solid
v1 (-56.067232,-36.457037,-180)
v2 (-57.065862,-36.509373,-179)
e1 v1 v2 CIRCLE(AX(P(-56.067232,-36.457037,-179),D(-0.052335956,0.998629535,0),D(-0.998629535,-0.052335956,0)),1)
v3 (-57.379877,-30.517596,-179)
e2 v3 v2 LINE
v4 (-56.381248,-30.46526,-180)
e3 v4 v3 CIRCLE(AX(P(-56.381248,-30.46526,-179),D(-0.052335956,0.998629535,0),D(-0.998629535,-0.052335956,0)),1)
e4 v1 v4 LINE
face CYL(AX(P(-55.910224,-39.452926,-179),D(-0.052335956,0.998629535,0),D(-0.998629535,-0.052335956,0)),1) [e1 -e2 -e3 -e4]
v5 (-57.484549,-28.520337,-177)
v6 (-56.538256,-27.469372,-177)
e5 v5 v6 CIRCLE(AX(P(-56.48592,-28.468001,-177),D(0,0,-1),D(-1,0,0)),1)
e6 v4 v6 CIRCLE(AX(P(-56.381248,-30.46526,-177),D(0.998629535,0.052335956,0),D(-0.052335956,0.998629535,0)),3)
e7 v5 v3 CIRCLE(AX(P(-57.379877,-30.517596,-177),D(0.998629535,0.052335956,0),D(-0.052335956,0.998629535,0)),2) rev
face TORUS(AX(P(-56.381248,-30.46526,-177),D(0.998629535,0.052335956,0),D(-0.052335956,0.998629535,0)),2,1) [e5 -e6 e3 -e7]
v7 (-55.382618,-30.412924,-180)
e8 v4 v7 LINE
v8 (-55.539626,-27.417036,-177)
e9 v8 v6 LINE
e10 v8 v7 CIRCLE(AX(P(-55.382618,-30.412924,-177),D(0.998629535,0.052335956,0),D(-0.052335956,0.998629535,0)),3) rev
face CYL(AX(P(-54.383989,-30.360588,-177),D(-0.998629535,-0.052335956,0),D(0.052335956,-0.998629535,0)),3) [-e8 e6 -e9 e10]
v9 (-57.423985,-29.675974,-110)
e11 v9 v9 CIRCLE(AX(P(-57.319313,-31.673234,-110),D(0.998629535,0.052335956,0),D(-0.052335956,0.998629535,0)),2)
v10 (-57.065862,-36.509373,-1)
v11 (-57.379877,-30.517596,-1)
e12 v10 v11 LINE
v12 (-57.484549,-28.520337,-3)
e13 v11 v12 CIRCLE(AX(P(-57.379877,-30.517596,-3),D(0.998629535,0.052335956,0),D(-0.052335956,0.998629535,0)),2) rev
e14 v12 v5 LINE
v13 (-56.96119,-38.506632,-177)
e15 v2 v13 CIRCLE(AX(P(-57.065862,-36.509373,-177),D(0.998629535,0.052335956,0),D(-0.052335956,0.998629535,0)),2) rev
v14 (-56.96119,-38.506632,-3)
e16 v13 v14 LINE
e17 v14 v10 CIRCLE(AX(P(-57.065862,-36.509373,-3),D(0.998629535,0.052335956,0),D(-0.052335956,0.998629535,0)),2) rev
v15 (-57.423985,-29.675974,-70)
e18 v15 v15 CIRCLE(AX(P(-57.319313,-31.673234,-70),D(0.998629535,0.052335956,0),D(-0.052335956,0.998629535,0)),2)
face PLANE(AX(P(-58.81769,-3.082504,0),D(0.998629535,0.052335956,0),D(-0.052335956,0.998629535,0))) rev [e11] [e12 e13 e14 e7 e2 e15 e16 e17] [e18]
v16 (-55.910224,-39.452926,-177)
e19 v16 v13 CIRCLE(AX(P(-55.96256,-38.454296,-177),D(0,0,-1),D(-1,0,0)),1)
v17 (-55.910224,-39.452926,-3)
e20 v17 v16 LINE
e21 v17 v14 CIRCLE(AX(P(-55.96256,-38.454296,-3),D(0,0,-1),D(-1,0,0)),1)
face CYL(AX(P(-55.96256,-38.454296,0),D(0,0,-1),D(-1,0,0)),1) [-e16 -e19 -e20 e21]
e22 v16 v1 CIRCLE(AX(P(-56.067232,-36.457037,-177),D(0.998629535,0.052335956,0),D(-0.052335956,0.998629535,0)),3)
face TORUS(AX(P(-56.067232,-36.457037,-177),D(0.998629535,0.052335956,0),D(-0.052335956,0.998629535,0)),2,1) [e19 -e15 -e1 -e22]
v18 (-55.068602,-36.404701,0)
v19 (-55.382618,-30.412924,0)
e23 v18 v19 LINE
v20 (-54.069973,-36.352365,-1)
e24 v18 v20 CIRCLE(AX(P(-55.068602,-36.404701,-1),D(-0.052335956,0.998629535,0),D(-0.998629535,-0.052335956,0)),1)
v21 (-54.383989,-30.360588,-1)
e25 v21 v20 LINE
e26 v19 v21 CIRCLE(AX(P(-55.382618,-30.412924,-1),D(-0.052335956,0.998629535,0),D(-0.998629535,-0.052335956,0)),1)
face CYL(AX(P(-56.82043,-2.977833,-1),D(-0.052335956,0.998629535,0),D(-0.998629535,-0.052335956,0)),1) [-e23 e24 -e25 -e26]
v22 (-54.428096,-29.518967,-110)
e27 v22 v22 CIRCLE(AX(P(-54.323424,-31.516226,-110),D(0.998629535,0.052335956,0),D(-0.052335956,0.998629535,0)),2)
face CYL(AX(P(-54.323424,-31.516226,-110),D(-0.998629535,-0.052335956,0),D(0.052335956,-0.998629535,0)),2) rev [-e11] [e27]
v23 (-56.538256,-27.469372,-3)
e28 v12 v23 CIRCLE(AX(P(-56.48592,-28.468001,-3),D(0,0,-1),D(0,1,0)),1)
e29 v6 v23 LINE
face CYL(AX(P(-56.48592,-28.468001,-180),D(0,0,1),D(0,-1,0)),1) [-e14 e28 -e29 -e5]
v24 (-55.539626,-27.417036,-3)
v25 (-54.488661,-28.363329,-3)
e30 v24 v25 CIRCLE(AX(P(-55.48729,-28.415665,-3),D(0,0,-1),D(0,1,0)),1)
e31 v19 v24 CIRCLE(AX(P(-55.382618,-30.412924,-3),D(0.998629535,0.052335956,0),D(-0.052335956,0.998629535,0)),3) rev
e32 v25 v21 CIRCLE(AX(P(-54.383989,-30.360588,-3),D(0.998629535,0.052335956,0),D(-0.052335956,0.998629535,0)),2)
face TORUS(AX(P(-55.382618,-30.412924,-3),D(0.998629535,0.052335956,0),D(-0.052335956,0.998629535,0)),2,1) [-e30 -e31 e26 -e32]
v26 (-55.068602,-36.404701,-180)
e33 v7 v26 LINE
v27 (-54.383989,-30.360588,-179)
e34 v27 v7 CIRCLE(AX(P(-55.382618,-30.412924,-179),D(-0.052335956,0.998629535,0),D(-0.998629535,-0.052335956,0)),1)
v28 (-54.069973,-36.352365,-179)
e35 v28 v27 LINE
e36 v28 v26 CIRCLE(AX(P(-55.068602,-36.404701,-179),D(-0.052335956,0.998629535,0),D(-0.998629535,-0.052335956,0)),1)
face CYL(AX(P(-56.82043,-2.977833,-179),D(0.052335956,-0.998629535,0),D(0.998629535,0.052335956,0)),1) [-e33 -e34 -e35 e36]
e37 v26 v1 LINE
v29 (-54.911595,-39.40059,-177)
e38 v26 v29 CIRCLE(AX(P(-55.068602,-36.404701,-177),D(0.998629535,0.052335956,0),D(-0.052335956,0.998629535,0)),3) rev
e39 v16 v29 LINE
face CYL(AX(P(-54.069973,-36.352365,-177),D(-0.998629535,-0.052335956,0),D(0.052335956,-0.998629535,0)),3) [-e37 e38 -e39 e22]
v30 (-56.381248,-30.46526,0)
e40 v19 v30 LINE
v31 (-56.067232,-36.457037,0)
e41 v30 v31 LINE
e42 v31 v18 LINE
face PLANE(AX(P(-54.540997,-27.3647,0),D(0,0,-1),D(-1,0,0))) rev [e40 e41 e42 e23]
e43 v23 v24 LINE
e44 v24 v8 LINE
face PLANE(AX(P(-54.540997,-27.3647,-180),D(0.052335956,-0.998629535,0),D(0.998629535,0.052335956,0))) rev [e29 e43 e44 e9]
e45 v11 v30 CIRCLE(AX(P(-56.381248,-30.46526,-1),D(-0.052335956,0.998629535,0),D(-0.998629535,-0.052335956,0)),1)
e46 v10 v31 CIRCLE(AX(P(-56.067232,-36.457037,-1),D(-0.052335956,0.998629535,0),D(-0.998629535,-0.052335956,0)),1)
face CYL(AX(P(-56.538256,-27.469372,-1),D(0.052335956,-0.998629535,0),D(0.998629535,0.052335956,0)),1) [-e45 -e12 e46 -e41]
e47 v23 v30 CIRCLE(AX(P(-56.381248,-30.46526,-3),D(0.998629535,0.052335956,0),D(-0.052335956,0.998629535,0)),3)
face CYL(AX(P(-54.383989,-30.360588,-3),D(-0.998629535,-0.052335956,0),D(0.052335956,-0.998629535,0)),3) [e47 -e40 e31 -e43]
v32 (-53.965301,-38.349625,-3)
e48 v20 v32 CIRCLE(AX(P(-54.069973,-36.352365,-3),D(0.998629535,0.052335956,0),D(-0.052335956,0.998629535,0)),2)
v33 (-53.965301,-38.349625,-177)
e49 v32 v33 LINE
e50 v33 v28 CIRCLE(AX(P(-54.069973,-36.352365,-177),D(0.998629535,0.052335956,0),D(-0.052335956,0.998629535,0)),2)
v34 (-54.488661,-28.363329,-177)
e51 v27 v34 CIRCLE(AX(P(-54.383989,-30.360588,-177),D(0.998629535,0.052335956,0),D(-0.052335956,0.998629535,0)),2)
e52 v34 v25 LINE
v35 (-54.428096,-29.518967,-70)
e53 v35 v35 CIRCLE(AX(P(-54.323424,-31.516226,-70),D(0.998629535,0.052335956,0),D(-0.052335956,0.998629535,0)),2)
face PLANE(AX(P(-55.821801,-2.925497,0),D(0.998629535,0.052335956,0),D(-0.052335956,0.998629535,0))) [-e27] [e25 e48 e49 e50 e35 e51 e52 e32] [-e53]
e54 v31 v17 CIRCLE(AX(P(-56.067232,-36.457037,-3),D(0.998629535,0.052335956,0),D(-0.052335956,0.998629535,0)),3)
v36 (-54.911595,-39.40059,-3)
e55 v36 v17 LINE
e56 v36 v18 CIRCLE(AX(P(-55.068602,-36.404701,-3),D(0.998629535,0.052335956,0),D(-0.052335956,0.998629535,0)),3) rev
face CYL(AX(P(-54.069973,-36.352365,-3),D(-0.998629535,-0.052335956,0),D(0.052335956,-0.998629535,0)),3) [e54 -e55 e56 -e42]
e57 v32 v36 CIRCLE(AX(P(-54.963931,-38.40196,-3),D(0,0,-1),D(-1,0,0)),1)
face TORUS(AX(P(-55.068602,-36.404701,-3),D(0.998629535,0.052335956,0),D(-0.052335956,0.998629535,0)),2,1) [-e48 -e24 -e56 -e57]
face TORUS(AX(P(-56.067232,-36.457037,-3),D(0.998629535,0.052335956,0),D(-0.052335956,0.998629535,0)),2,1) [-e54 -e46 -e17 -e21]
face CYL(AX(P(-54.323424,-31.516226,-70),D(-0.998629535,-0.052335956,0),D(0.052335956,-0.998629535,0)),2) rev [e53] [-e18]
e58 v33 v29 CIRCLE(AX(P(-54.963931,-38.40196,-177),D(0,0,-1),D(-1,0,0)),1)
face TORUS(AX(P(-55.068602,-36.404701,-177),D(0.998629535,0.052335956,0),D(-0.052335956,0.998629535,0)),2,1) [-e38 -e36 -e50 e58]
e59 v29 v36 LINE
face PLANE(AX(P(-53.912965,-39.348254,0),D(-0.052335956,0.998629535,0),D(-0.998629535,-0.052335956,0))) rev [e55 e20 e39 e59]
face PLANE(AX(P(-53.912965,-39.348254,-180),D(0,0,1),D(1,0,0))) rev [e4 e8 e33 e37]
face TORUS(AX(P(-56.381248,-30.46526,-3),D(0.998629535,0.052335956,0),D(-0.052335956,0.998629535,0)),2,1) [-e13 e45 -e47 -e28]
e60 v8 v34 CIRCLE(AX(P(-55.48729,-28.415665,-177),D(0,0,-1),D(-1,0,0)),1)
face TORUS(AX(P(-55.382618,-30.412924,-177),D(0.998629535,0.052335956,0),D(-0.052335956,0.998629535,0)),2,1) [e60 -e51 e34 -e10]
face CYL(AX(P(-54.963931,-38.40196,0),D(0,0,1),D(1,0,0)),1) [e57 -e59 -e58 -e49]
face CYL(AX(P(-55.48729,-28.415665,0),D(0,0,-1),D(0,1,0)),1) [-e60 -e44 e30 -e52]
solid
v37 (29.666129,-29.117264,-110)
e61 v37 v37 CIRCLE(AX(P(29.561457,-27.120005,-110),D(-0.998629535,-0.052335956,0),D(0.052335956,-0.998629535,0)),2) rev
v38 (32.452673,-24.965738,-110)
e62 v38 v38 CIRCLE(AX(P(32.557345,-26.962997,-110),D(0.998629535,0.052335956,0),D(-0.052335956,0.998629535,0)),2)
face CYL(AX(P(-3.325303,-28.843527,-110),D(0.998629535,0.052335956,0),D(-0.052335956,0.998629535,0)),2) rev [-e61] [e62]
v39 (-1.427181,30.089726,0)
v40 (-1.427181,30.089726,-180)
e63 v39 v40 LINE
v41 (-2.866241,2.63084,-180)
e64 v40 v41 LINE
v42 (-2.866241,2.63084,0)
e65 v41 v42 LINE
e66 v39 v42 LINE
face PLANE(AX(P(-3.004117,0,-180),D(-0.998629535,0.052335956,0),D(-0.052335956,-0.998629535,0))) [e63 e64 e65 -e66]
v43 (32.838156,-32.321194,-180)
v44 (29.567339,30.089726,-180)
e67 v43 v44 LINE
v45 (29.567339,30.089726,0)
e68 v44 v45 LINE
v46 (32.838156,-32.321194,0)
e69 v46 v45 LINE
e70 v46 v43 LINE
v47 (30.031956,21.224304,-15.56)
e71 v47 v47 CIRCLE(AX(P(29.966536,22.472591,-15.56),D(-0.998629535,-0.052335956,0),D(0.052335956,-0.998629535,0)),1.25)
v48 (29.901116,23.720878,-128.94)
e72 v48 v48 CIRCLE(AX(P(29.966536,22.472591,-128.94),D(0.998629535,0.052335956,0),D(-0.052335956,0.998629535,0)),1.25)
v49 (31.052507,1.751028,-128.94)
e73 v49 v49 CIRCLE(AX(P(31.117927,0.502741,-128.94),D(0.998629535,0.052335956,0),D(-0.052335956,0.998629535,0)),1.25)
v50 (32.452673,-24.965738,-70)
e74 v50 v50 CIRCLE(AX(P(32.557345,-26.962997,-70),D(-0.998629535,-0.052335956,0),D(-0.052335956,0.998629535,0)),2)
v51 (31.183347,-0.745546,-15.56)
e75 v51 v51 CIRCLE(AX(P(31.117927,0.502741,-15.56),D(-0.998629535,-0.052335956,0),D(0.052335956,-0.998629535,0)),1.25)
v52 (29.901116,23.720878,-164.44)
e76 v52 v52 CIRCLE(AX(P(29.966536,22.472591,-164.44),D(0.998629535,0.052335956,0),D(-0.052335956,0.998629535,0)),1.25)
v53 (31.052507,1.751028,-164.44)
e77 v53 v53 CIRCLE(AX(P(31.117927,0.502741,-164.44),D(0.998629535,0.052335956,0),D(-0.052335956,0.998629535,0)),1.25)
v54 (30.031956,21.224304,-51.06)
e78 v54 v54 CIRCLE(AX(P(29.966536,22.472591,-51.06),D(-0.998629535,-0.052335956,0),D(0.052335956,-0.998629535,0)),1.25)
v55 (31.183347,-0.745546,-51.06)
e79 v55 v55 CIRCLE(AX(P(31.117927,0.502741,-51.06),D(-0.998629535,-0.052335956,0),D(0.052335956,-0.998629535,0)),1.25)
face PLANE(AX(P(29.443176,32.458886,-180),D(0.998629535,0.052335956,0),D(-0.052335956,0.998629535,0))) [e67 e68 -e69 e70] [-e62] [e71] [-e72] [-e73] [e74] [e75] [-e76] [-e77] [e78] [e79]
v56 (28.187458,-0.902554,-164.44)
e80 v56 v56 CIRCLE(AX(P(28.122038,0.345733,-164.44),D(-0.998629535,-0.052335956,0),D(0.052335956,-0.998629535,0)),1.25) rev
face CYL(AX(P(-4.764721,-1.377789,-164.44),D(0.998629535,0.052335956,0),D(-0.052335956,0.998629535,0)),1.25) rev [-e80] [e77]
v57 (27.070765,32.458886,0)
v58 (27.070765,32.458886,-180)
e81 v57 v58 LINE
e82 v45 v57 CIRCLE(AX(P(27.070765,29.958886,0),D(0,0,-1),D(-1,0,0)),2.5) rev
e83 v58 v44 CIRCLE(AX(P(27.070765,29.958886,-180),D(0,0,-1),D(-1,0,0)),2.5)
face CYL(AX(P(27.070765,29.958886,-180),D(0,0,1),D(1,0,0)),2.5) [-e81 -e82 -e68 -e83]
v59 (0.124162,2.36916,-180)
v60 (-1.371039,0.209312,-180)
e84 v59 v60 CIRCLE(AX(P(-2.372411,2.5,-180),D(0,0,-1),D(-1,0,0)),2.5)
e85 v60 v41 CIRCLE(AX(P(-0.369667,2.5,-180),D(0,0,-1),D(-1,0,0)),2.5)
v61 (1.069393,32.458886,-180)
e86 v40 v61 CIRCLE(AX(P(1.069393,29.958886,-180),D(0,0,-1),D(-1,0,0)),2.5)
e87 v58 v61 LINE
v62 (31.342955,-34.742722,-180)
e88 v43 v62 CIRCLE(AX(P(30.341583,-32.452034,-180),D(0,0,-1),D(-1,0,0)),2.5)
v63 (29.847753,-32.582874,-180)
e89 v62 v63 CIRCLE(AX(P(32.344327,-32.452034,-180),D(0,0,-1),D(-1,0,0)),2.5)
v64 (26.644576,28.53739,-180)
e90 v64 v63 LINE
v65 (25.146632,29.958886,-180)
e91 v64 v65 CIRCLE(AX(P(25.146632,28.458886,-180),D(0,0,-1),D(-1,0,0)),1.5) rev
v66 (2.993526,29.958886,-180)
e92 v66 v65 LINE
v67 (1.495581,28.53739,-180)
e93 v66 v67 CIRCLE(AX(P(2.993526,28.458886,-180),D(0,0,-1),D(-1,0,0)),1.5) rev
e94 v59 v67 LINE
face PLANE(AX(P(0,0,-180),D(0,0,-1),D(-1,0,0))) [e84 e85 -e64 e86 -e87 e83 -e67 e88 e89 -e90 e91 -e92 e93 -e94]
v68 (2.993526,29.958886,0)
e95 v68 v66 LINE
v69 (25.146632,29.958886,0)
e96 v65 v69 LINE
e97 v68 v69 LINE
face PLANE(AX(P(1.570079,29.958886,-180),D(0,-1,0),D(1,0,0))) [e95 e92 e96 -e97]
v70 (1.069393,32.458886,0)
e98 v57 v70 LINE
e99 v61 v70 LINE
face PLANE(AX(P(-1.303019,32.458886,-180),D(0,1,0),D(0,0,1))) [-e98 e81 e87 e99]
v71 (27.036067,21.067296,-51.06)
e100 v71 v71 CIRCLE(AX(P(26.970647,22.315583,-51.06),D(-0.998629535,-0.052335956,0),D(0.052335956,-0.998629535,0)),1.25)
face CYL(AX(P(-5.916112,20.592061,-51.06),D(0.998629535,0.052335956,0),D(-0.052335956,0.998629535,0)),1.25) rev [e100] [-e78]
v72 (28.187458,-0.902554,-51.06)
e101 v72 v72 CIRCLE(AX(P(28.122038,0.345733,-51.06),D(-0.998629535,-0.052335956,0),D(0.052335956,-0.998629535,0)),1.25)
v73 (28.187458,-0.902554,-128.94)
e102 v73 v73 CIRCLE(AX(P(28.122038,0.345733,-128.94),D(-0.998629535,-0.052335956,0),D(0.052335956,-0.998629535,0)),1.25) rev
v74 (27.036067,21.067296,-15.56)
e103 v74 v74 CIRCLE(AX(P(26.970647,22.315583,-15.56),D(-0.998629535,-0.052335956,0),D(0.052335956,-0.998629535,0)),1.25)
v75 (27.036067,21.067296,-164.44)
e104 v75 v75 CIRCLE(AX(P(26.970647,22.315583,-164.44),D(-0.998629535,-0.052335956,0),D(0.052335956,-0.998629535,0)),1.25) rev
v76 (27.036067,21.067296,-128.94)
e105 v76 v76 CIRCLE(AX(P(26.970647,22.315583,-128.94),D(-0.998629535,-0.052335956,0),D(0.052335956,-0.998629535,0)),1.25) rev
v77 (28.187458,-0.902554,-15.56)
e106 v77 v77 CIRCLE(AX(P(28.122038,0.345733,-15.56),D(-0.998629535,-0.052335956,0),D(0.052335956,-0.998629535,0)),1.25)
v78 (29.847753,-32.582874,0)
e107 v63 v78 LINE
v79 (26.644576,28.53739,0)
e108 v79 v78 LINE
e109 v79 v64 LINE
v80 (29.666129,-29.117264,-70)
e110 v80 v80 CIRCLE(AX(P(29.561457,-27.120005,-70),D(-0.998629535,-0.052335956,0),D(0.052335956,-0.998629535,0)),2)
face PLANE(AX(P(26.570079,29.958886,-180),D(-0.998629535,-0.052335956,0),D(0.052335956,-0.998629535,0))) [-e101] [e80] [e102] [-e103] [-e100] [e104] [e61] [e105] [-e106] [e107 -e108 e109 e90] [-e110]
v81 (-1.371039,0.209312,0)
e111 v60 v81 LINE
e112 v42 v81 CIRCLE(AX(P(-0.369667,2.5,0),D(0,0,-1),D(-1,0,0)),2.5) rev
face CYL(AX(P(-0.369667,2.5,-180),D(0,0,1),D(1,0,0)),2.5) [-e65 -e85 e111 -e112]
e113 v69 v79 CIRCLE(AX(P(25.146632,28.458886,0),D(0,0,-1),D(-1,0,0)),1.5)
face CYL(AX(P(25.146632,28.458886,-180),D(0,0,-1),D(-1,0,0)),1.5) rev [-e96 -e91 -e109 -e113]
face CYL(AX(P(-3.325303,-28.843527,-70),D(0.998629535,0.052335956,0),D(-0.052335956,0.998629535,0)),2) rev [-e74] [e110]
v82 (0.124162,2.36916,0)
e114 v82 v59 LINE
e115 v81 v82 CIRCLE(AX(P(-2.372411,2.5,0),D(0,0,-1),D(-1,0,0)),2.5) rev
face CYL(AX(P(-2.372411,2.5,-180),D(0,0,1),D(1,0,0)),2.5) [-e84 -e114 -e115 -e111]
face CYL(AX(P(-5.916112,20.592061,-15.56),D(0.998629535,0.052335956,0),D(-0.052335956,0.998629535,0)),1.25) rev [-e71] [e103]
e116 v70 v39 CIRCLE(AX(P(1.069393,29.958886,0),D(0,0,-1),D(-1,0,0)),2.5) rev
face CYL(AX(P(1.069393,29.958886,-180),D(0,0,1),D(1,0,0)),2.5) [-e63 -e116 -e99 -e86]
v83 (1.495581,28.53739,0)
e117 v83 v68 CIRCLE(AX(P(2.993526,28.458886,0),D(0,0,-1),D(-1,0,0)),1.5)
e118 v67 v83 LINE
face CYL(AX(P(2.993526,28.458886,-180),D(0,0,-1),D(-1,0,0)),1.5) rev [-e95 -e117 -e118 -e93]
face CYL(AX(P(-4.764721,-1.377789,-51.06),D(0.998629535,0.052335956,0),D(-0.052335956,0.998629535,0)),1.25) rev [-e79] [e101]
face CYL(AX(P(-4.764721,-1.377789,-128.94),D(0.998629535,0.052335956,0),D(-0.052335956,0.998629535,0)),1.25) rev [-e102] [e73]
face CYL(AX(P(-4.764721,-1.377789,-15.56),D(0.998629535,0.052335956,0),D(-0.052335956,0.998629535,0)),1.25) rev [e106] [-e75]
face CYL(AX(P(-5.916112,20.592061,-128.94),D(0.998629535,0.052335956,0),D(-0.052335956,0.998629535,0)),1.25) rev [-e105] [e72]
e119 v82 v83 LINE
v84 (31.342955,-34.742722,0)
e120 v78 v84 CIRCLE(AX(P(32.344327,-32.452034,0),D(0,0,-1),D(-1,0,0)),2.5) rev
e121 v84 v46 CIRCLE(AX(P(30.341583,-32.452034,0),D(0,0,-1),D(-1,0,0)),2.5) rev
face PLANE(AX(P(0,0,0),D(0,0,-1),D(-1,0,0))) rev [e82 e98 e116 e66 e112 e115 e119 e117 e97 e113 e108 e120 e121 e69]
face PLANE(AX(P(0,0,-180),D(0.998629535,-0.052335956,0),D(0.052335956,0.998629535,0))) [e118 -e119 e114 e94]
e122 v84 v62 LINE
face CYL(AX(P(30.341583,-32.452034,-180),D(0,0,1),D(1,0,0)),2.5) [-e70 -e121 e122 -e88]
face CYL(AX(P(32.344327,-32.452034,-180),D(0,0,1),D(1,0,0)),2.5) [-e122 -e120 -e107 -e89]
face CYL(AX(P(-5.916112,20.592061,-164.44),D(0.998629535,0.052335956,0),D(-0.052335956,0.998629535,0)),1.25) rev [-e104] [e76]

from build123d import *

# Parameters (mm, degrees)
BOSS_EXTRUDE1_DEPTH = 180
HOLDER_CUT_REACH    = 188.811
SKETCH2_R           = 1.25
CUT_EXTRUDE2_REACH  = 188.811
SKETCH4_R           = 2
FILLET2_R           = 1.5
FILLET3_R           = 2.5
SKETCH5_W           = 180
SKETCH5_H           = 12
SKETCH5_R           = 2
BOSS_EXTRUDE2_DEPTH = 3
FILLET1_R           = 3
FILLET4_R           = 2.5
FILLET5_R           = 2.5
FILLET6_R           = 1


with BuildPart() as part:
    # Sketch1 → Boss-Extrude1 (new body)
    with BuildSketch(Plane.XY):
        Polygon((0, 0), (1.570078687, 29.958886043), (26.570078687, 29.958886043), (29.971915843, -34.952033716), (32.976032881, -34.952033716), (29.443176277, 32.458886043), (-1.303018902, 32.458886043), (-3.004117038, 0), align=None)
    extrude(amount=-BOSS_EXTRUDE1_DEPTH)

    # Sketch2 → Holder cut (cut, up to next)
    with BuildSketch(Plane(origin=(31.058968616, 1.627731572, 0), x_dir=(0, 0, -1), z_dir=(0.998629534754574, 0.05233595624294041, 0)), mode=Mode.PRIVATE) as holder_cut_sk1:
        with Locations(Location((128.94, 20.873465482, 0), (0, 0, 90))):
            Circle(SKETCH2_R)
    holder_cut_tool1 = extrude(holder_cut_sk1.sketch, amount=-HOLDER_CUT_REACH, mode=Mode.PRIVATE) & part.part
    # Sketch2 → Holder cut (cut, up to next)
    with BuildSketch(Plane(origin=(31.058968616, 1.627731572, 0), x_dir=(0, 0, -1), z_dir=(0.998629534754574, 0.05233595624294041, 0)), mode=Mode.PRIVATE) as holder_cut_sk2:
        with Locations(Location((164.44, 20.873465482, 0), (0, 0, 90))):
            Circle(SKETCH2_R)
    holder_cut_tool2 = extrude(holder_cut_sk2.sketch, amount=-HOLDER_CUT_REACH, mode=Mode.PRIVATE) & part.part
    # Sketch2 → Holder cut (cut, up to next)
    with BuildSketch(Plane(origin=(31.058968616, 1.627731572, 0), x_dir=(0, 0, -1), z_dir=(0.998629534754574, 0.05233595624294041, 0)), mode=Mode.PRIVATE) as holder_cut_sk3:
        with Locations(Location((128.94, -1.126534518, 0), (0, 0, 90))):
            Circle(SKETCH2_R)
    holder_cut_tool3 = extrude(holder_cut_sk3.sketch, amount=-HOLDER_CUT_REACH, mode=Mode.PRIVATE) & part.part
    # Sketch2 → Holder cut (cut, up to next)
    with BuildSketch(Plane(origin=(31.058968616, 1.627731572, 0), x_dir=(0, 0, -1), z_dir=(0.998629534754574, 0.05233595624294041, 0)), mode=Mode.PRIVATE) as holder_cut_sk4:
        with Locations(Location((164.44, -1.126534518, 0), (0, 0, 90))):
            Circle(SKETCH2_R)
    holder_cut_tool4 = extrude(holder_cut_sk4.sketch, amount=-HOLDER_CUT_REACH, mode=Mode.PRIVATE) & part.part
    # Sketch2 → Holder cut (cut, up to next)
    with BuildSketch(Plane(origin=(31.058968616, 1.627731572, 0), x_dir=(0, 0, -1), z_dir=(0.998629534754574, 0.05233595624294041, 0)), mode=Mode.PRIVATE) as holder_cut_sk5:
        with Locations(Location((51.06, -1.126534518, 0), (0, 0, 270))):
            Circle(SKETCH2_R)
    holder_cut_tool5 = extrude(holder_cut_sk5.sketch, amount=-HOLDER_CUT_REACH, mode=Mode.PRIVATE) & part.part
    # Sketch2 → Holder cut (cut, up to next)
    with BuildSketch(Plane(origin=(31.058968616, 1.627731572, 0), x_dir=(0, 0, -1), z_dir=(0.998629534754574, 0.05233595624294041, 0)), mode=Mode.PRIVATE) as holder_cut_sk6:
        with Locations(Location((15.56, -1.126534518, 0), (0, 0, 270))):
            Circle(SKETCH2_R)
    holder_cut_tool6 = extrude(holder_cut_sk6.sketch, amount=-HOLDER_CUT_REACH, mode=Mode.PRIVATE) & part.part
    # Sketch2 → Holder cut (cut, up to next)
    with BuildSketch(Plane(origin=(31.058968616, 1.627731572, 0), x_dir=(0, 0, -1), z_dir=(0.998629534754574, 0.05233595624294041, 0)), mode=Mode.PRIVATE) as holder_cut_sk7:
        with Locations(Location((15.56, 20.873465482, 0), (0, 0, 270))):
            Circle(SKETCH2_R)
    holder_cut_tool7 = extrude(holder_cut_sk7.sketch, amount=-HOLDER_CUT_REACH, mode=Mode.PRIVATE) & part.part
    # Sketch2 → Holder cut (cut, up to next)
    with BuildSketch(Plane(origin=(31.058968616, 1.627731572, 0), x_dir=(0, 0, -1), z_dir=(0.998629534754574, 0.05233595624294041, 0)), mode=Mode.PRIVATE) as holder_cut_sk8:
        with Locations(Location((51.06, 20.873465482, 0), (0, 0, 270))):
            Circle(SKETCH2_R)
    holder_cut_tool8 = extrude(holder_cut_sk8.sketch, amount=-HOLDER_CUT_REACH, mode=Mode.PRIVATE) & part.part
    add(holder_cut_tool1.solids().sort_by_distance((29.966536, 22.472591, -128.94))[0], mode=Mode.SUBTRACT)
    add(holder_cut_tool2.solids().sort_by_distance((29.966536, 22.472591, -164.44))[0], mode=Mode.SUBTRACT)
    add(holder_cut_tool3.solids().sort_by_distance((31.117927, 0.502741, -128.94))[0], mode=Mode.SUBTRACT)
    add(holder_cut_tool4.solids().sort_by_distance((31.117927, 0.502741, -164.44))[0], mode=Mode.SUBTRACT)
    add(holder_cut_tool5.solids().sort_by_distance((31.117927, 0.502741, -51.06))[0], mode=Mode.SUBTRACT)
    add(holder_cut_tool6.solids().sort_by_distance((31.117927, 0.502741, -15.56))[0], mode=Mode.SUBTRACT)
    add(holder_cut_tool7.solids().sort_by_distance((29.966536, 22.472591, -15.56))[0], mode=Mode.SUBTRACT)
    add(holder_cut_tool8.solids().sort_by_distance((29.966536, 22.472591, -51.06))[0], mode=Mode.SUBTRACT)

    # Sketch4 → Cut-Extrude2 (cut, up to next)
    with BuildSketch(Plane(origin=(31.058968616, 1.627731572, 0), x_dir=(0, 0, -1), z_dir=(0.998629534754574, 0.05233595624294041, 0)), mode=Mode.PRIVATE) as cut_extrude2_sk1:
        with Locations(Location((110, -28.629965383, 0), (0, 0, 90))):
            Circle(SKETCH4_R)
    cut_extrude2_tool1 = extrude(cut_extrude2_sk1.sketch, amount=-CUT_EXTRUDE2_REACH, mode=Mode.PRIVATE) & part.part
    cut_extrude2 = cut_extrude2_tool1.solids().sort_by_distance((32.557345, -26.962997, -110))[0]
    add(cut_extrude2, mode=Mode.SUBTRACT)

    # Mirror1: Cut-Extrude2 across plane
    add(cut_extrude2.mirror(Plane.XY.offset(-90)), mode=Mode.SUBTRACT)

    # Fillet2
    fillet2_edges = [part.edges().sort_by_distance(p)[0] for p in [
        (26.570078687, 29.958886043, -90),
        (1.570078687, 29.958886043, -90),
    ]]
    fillet(fillet2_edges, radius=FILLET2_R)

    # Fillet3
    # the kernel refuses this fillet: 2.5 mm, written as the material it takes off along each edge
    with BuildSketch(Plane(origin=(-3.004117038, 0, 6.586125783), x_dir=(1, 0, 0), z_dir=(0, 0, -1))) as fillet3_piece_1:
        with BuildLine():
            CenterArc((FILLET3_R * 1.05378012528, -FILLET3_R), FILLET3_R, 90, 93)
            Line((FILLET3_R * 0.0551505905264, -FILLET3_R * 1.05233595624), (0, 0))
            Line((0, 0), (FILLET3_R * 1.05378012528, 0))
        make_face()
    extrude(amount=193.172251566, mode=Mode.SUBTRACT)
    with BuildSketch(Plane(origin=(0, 0, 5.931028542), x_dir=(0.05233595624294039, 0.9986295347545739, 0), z_dir=(0, 0, -1))) as fillet3_piece_2:
        with BuildLine():
            CenterArc((FILLET3_R * 0.948964566715, -FILLET3_R), FILLET3_R, 90, 87)
            Line((-FILLET3_R * 0.0496649680397, -FILLET3_R * 0.947664043757), (0, 0))
            Line((0, 0), (FILLET3_R * 0.948964566715, 0))
        make_face()
    extrude(amount=191.862057084, mode=Mode.SUBTRACT)

    # Fillet4
    # the kernel refuses this fillet: 2.5 mm, written as the material it takes off along each edge
    with BuildSketch(Plane(origin=(32.976032881, -34.952033716, 6.586125783), x_dir=(-0.05233595624293978, 0.998629534754574, 0), z_dir=(0, 0, -1))) as fillet4_piece_1:
        with BuildLine():
            CenterArc((FILLET4_R * 1.05378012528, -FILLET4_R), FILLET4_R, 90, 93)
            Line((FILLET4_R * 0.0551505905264, -FILLET4_R * 1.05233595624), (0, 0))
            Line((0, 0), (FILLET4_R * 1.05378012528, 0))
        make_face()
    extrude(amount=193.172251566, mode=Mode.SUBTRACT)
    with BuildSketch(Plane(origin=(29.971915843, -34.952033716, 5.931028542), x_dir=(1, 0, 0), z_dir=(0, 0, -1))) as fillet4_piece_2:
        with BuildLine():
            CenterArc((FILLET4_R * 0.948964566715, -FILLET4_R), FILLET4_R, 90, 87)
            Line((-FILLET4_R * 0.0496649680397, -FILLET4_R * 0.947664043757), (0, 0))
            Line((0, 0), (FILLET4_R * 0.948964566715, 0))
        make_face()
    extrude(amount=191.862057084, mode=Mode.SUBTRACT)

    # Fillet5
    fillet5_edges = [part.edges().sort_by_distance(p)[0] for p in [
        (-1.303018902, 32.458886043, -90),
        (29.443176277, 32.458886043, -90),
    ]]
    fillet(fillet5_edges, radius=FILLET5_R)


with BuildPart() as body_2:
    # Sketch5 → Boss-Extrude2 (new body)
    with BuildSketch(Plane(origin=(-58.817689512, -3.08250449, 0), x_dir=(0, 0, -1), z_dir=(0.998629534754574, 0.05233595624294041, 0))):
        with Locations((90, -30.472742045)):
            Rectangle(SKETCH5_W, SKETCH5_H)
        with Locations(Location((110, -28.629965383, 0), (0, 0, 90))):
            Circle(SKETCH5_R, mode=Mode.SUBTRACT)
        with Locations(Location((70, -28.629965383, 0), (0, 0, 90))):
            Circle(SKETCH5_R, mode=Mode.SUBTRACT)
    extrude(amount=BOSS_EXTRUDE2_DEPTH)

    # Fillet1
    fillet1_edges = [body_2.edges().sort_by_distance(p)[0] for p in [
        (-55.410909378, -39.426757975, 0),
        (-56.038940853, -27.443203558, 0),
        (-56.038940853, -27.443203558, -180),
        (-55.410909378, -39.426757975, -180),
    ]]
    fillet(fillet1_edges, radius=FILLET1_R)

    # Fillet6
    fillet6_edges = [body_2.edges().sort_by_distance(p)[0] for p in [
        (-57.222869418, -33.513484701, -180),
        (-54.226980814, -33.356476832, -180),
        (-56.908853681, -39.50526191, -90),
        (-57.222869418, -33.513484701, 0),
        (-57.536885155, -27.521707492, -90),
        (-56.954840221, -38.627786453, -0.878679656),
        (-57.490898615, -28.399182949, -0.878679656),
        (-57.490898615, -28.399182949, -179.121320344),
        (-56.954840221, -38.627786453, -179.121320344),
        (-53.912965076, -39.348254041, -90),
        (-54.540996551, -27.364699624, -90),
        (-54.226980814, -33.356476832, 0),
        (-53.958951616, -38.470778584, -0.878679656),
        (-54.495010011, -28.24217508, -0.878679656),
        (-54.495010011, -28.24217508, -179.121320344),
        (-53.958951616, -38.470778584, -179.121320344),
    ]]
    fillet(fillet6_edges, radius=FILLET6_R)


solid = Compound([part.part, body_2.part])
